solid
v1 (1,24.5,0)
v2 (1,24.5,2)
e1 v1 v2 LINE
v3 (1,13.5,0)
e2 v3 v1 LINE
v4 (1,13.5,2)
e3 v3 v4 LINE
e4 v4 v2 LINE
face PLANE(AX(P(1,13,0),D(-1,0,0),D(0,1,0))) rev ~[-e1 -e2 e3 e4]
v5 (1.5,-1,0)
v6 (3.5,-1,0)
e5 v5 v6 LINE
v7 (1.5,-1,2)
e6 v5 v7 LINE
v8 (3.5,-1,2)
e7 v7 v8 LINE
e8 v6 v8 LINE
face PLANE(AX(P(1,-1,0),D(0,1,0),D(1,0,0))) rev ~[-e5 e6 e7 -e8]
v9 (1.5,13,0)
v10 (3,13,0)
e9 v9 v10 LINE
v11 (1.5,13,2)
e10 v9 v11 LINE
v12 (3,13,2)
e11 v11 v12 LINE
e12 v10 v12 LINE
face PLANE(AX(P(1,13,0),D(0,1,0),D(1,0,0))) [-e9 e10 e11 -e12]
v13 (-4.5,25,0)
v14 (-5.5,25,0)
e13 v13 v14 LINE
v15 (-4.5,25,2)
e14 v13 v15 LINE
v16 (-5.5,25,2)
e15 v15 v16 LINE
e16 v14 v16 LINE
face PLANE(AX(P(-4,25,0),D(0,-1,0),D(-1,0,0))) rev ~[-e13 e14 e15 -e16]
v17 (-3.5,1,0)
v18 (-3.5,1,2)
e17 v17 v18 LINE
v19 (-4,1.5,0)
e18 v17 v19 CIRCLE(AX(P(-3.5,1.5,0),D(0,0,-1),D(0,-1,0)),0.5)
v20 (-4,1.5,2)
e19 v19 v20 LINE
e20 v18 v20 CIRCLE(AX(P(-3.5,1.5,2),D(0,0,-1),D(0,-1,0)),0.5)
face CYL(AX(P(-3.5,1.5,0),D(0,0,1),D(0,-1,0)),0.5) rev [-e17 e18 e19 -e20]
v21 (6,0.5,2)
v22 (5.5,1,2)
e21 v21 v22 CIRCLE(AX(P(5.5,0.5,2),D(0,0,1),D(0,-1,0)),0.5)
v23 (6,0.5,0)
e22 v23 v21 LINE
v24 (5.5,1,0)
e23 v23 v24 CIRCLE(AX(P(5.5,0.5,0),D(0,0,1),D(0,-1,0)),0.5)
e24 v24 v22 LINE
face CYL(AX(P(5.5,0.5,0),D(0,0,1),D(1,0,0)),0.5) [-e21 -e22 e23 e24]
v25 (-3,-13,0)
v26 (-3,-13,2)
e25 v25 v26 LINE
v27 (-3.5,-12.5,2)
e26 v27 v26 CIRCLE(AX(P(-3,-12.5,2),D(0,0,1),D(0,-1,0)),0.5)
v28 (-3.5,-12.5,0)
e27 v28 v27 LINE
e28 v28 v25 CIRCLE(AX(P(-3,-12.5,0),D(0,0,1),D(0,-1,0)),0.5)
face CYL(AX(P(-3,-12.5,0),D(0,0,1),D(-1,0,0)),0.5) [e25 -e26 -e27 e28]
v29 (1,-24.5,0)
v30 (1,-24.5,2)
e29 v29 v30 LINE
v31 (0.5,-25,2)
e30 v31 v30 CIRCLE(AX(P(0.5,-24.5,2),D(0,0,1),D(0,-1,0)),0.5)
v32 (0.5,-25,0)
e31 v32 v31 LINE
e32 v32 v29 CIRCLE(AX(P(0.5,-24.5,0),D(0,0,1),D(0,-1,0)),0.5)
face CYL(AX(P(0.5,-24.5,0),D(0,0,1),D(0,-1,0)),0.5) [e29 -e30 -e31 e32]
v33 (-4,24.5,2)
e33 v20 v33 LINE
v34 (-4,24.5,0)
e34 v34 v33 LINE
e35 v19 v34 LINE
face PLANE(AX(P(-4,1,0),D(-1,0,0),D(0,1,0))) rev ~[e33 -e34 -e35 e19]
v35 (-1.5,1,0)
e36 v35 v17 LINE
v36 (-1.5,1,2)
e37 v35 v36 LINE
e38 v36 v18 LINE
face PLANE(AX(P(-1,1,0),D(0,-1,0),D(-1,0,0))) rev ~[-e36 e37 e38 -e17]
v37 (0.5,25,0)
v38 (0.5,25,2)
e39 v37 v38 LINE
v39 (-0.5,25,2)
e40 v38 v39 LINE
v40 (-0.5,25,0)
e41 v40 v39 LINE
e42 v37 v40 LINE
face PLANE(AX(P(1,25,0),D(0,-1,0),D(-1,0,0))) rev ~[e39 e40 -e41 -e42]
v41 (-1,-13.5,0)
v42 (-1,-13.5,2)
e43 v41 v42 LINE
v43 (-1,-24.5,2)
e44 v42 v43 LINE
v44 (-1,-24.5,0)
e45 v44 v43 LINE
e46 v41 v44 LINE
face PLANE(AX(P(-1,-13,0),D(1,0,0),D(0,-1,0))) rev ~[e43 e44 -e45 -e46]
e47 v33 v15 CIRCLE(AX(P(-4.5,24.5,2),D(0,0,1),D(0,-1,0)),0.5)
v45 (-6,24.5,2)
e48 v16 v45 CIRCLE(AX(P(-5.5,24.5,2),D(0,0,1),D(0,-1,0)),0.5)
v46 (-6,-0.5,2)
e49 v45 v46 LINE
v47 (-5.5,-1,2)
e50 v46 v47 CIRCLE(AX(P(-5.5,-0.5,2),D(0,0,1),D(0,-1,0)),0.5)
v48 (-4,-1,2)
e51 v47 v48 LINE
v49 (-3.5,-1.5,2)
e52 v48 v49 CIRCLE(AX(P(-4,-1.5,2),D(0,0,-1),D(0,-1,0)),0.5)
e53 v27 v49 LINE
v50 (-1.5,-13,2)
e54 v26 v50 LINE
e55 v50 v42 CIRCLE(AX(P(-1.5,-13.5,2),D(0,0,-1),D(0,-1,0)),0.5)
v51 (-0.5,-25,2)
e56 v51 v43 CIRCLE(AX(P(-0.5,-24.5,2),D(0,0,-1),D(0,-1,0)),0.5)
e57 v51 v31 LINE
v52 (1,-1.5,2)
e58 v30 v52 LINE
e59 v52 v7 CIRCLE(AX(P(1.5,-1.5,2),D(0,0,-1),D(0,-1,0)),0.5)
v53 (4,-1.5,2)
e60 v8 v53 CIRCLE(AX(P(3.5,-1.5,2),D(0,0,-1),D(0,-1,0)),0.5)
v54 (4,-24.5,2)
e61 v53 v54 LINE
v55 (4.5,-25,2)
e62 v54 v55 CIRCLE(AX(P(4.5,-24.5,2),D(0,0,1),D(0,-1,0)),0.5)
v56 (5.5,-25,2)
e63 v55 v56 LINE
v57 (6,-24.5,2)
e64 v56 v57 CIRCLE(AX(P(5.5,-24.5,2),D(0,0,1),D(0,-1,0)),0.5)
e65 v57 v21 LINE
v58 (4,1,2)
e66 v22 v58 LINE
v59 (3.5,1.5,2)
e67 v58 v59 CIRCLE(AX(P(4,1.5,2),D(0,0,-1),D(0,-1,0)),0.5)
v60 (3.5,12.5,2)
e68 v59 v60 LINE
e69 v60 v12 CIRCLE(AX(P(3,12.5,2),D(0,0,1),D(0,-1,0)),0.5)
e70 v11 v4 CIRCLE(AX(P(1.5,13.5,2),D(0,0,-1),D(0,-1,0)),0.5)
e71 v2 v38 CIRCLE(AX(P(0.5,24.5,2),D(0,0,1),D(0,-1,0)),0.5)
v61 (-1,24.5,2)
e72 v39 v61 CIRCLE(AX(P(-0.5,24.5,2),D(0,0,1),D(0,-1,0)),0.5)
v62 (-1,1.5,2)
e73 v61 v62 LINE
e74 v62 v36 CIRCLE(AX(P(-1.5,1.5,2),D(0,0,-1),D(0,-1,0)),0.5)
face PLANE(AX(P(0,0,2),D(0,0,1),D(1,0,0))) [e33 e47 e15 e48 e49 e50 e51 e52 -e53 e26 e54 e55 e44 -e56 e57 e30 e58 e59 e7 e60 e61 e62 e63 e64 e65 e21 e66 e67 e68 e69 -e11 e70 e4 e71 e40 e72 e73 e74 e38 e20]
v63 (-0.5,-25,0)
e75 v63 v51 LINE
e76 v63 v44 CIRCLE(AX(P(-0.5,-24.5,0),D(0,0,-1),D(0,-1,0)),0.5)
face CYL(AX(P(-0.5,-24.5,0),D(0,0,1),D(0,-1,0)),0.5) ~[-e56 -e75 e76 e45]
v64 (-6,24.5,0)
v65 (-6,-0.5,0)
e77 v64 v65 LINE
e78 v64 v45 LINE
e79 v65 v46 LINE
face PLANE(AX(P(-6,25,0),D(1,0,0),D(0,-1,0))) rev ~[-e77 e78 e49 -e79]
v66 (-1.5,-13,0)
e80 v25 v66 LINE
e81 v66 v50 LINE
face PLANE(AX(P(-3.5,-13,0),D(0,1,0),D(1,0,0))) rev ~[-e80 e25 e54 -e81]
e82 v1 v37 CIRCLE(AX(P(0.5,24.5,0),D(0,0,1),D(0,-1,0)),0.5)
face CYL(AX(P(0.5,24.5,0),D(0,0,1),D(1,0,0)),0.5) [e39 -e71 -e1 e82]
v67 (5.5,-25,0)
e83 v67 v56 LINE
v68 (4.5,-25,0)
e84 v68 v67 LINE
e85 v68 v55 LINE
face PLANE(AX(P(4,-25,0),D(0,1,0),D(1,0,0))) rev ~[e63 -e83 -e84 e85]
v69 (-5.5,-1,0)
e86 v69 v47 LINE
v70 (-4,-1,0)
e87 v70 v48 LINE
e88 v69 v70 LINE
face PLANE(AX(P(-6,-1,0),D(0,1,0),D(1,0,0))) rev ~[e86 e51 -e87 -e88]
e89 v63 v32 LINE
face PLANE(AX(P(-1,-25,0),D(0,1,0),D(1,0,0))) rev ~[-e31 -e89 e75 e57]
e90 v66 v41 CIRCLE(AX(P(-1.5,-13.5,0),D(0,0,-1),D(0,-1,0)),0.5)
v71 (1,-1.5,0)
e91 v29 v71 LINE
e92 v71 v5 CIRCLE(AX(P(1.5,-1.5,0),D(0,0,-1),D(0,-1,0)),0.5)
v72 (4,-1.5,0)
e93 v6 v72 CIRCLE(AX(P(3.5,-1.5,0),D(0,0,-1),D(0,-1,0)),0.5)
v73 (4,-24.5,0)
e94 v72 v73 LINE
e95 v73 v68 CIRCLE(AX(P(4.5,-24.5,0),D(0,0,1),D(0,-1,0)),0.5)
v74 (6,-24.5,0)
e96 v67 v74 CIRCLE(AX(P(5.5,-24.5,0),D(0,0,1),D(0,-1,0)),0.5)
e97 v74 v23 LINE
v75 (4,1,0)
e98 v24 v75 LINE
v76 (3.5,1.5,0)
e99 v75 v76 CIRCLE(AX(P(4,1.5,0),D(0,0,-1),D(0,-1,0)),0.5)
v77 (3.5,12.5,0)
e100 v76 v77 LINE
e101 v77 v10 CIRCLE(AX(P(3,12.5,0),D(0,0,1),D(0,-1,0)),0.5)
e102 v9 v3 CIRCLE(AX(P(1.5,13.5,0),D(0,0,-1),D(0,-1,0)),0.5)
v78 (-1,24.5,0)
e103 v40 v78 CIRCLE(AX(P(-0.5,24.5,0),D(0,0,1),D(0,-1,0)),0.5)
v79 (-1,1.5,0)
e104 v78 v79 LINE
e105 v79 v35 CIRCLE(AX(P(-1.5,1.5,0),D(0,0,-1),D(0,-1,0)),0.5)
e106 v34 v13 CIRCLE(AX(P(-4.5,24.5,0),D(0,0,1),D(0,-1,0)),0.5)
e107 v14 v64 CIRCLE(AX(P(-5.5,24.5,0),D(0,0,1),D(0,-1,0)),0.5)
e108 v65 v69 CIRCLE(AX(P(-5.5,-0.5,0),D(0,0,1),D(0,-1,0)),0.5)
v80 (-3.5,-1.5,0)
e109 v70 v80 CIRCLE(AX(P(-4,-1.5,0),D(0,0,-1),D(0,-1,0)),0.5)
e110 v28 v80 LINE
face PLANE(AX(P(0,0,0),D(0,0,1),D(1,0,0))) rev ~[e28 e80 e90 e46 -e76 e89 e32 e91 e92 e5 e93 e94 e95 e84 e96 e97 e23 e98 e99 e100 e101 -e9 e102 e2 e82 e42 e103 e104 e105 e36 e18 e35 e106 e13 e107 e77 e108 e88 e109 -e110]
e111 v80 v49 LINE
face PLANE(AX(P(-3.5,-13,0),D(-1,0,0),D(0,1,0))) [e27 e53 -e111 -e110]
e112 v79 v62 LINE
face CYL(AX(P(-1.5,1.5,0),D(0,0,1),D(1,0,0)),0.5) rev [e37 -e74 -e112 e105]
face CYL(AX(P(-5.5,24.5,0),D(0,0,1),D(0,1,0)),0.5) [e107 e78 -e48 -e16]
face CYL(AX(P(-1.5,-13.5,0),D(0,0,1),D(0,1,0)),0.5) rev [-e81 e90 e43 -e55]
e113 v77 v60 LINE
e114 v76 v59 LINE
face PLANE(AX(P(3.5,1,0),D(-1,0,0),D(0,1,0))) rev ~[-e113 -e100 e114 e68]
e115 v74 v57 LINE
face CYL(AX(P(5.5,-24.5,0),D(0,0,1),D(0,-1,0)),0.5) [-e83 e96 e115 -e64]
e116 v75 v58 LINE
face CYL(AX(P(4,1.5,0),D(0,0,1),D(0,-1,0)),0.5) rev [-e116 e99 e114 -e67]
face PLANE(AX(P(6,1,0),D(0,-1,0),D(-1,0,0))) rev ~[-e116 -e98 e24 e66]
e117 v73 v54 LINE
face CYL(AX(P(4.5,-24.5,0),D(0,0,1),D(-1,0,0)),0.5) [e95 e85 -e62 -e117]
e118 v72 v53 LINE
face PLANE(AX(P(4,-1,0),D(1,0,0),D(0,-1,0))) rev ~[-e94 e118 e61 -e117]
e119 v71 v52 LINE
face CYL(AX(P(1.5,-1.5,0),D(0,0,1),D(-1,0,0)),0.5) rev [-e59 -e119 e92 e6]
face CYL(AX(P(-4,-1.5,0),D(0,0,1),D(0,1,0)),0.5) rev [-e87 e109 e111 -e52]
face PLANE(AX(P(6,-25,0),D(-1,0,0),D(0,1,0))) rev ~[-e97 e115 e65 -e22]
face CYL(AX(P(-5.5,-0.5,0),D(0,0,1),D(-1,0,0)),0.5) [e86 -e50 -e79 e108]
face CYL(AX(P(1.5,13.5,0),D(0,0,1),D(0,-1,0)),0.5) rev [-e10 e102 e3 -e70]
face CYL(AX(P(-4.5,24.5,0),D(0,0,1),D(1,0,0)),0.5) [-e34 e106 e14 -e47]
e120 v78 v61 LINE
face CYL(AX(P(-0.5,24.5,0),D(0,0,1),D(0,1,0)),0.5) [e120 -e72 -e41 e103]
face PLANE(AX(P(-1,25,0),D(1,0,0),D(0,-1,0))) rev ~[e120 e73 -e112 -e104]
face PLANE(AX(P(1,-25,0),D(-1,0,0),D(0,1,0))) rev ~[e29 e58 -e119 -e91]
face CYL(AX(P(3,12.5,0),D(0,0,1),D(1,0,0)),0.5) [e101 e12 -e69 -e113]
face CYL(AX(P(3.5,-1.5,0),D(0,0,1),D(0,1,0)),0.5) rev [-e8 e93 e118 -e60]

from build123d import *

# Parameters (mm, degrees)
F0_W     = 2.5
F0_H     = 12
F1_DEPTH = 2
F2_R     = 0.5


with BuildPart() as f1:
    # F0 (on Top) → F1 (new body)
    with BuildSketch(Plane.XY):
        Polygon((-1, -13), (-1, -25), (1, -25), (1, -1), (1, 1), (1, 13), (1, 25), (-1, 25), (-1, 1), (-1, -1), align=None)
        with Locations((-2.25, -7)):
            Rectangle(F0_W, F0_H)
        Polygon((1, 1), (1, -1), (4, -1), (4, -25), (6, -25), (6, 1), (3.5, 1), align=None)
        Polygon((-3.5, -1), (-1, -1), (-1, 1), (-4, 1), (-4, 25), (-6, 25), (-6, -1), align=None)
        with Locations((2.25, 7)):
            Rectangle(F0_W, F0_H)
    extrude(amount=F1_DEPTH)

    # F2
    f2_edges = [f1.edges().sort_by_distance(p)[0] for p in [
        (-1, -25, 1),
        (-1, 1, 1),
        (-6, -1, 1),
        (1, -25, 1),
        (4, -25, 1),
        (6, -25, 1),
        (1, -1, 1),
        (4, -1, 1),
        (6, 1, 1),
        (-4, 1, 1),
        (-6, 25, 1),
        (-4, 25, 1),
        (-1, 25, 1),
        (1, 25, 1),
        (3.5, 13, 1),
        (-3.5, -13, 1),
        (-3.5, -1, 1),
        (3.5, 1, 1),
        (-1, -13, 1),
        (1, 13, 1),
    ]]
    fillet(f2_edges, radius=F2_R)


solid = f1.part
